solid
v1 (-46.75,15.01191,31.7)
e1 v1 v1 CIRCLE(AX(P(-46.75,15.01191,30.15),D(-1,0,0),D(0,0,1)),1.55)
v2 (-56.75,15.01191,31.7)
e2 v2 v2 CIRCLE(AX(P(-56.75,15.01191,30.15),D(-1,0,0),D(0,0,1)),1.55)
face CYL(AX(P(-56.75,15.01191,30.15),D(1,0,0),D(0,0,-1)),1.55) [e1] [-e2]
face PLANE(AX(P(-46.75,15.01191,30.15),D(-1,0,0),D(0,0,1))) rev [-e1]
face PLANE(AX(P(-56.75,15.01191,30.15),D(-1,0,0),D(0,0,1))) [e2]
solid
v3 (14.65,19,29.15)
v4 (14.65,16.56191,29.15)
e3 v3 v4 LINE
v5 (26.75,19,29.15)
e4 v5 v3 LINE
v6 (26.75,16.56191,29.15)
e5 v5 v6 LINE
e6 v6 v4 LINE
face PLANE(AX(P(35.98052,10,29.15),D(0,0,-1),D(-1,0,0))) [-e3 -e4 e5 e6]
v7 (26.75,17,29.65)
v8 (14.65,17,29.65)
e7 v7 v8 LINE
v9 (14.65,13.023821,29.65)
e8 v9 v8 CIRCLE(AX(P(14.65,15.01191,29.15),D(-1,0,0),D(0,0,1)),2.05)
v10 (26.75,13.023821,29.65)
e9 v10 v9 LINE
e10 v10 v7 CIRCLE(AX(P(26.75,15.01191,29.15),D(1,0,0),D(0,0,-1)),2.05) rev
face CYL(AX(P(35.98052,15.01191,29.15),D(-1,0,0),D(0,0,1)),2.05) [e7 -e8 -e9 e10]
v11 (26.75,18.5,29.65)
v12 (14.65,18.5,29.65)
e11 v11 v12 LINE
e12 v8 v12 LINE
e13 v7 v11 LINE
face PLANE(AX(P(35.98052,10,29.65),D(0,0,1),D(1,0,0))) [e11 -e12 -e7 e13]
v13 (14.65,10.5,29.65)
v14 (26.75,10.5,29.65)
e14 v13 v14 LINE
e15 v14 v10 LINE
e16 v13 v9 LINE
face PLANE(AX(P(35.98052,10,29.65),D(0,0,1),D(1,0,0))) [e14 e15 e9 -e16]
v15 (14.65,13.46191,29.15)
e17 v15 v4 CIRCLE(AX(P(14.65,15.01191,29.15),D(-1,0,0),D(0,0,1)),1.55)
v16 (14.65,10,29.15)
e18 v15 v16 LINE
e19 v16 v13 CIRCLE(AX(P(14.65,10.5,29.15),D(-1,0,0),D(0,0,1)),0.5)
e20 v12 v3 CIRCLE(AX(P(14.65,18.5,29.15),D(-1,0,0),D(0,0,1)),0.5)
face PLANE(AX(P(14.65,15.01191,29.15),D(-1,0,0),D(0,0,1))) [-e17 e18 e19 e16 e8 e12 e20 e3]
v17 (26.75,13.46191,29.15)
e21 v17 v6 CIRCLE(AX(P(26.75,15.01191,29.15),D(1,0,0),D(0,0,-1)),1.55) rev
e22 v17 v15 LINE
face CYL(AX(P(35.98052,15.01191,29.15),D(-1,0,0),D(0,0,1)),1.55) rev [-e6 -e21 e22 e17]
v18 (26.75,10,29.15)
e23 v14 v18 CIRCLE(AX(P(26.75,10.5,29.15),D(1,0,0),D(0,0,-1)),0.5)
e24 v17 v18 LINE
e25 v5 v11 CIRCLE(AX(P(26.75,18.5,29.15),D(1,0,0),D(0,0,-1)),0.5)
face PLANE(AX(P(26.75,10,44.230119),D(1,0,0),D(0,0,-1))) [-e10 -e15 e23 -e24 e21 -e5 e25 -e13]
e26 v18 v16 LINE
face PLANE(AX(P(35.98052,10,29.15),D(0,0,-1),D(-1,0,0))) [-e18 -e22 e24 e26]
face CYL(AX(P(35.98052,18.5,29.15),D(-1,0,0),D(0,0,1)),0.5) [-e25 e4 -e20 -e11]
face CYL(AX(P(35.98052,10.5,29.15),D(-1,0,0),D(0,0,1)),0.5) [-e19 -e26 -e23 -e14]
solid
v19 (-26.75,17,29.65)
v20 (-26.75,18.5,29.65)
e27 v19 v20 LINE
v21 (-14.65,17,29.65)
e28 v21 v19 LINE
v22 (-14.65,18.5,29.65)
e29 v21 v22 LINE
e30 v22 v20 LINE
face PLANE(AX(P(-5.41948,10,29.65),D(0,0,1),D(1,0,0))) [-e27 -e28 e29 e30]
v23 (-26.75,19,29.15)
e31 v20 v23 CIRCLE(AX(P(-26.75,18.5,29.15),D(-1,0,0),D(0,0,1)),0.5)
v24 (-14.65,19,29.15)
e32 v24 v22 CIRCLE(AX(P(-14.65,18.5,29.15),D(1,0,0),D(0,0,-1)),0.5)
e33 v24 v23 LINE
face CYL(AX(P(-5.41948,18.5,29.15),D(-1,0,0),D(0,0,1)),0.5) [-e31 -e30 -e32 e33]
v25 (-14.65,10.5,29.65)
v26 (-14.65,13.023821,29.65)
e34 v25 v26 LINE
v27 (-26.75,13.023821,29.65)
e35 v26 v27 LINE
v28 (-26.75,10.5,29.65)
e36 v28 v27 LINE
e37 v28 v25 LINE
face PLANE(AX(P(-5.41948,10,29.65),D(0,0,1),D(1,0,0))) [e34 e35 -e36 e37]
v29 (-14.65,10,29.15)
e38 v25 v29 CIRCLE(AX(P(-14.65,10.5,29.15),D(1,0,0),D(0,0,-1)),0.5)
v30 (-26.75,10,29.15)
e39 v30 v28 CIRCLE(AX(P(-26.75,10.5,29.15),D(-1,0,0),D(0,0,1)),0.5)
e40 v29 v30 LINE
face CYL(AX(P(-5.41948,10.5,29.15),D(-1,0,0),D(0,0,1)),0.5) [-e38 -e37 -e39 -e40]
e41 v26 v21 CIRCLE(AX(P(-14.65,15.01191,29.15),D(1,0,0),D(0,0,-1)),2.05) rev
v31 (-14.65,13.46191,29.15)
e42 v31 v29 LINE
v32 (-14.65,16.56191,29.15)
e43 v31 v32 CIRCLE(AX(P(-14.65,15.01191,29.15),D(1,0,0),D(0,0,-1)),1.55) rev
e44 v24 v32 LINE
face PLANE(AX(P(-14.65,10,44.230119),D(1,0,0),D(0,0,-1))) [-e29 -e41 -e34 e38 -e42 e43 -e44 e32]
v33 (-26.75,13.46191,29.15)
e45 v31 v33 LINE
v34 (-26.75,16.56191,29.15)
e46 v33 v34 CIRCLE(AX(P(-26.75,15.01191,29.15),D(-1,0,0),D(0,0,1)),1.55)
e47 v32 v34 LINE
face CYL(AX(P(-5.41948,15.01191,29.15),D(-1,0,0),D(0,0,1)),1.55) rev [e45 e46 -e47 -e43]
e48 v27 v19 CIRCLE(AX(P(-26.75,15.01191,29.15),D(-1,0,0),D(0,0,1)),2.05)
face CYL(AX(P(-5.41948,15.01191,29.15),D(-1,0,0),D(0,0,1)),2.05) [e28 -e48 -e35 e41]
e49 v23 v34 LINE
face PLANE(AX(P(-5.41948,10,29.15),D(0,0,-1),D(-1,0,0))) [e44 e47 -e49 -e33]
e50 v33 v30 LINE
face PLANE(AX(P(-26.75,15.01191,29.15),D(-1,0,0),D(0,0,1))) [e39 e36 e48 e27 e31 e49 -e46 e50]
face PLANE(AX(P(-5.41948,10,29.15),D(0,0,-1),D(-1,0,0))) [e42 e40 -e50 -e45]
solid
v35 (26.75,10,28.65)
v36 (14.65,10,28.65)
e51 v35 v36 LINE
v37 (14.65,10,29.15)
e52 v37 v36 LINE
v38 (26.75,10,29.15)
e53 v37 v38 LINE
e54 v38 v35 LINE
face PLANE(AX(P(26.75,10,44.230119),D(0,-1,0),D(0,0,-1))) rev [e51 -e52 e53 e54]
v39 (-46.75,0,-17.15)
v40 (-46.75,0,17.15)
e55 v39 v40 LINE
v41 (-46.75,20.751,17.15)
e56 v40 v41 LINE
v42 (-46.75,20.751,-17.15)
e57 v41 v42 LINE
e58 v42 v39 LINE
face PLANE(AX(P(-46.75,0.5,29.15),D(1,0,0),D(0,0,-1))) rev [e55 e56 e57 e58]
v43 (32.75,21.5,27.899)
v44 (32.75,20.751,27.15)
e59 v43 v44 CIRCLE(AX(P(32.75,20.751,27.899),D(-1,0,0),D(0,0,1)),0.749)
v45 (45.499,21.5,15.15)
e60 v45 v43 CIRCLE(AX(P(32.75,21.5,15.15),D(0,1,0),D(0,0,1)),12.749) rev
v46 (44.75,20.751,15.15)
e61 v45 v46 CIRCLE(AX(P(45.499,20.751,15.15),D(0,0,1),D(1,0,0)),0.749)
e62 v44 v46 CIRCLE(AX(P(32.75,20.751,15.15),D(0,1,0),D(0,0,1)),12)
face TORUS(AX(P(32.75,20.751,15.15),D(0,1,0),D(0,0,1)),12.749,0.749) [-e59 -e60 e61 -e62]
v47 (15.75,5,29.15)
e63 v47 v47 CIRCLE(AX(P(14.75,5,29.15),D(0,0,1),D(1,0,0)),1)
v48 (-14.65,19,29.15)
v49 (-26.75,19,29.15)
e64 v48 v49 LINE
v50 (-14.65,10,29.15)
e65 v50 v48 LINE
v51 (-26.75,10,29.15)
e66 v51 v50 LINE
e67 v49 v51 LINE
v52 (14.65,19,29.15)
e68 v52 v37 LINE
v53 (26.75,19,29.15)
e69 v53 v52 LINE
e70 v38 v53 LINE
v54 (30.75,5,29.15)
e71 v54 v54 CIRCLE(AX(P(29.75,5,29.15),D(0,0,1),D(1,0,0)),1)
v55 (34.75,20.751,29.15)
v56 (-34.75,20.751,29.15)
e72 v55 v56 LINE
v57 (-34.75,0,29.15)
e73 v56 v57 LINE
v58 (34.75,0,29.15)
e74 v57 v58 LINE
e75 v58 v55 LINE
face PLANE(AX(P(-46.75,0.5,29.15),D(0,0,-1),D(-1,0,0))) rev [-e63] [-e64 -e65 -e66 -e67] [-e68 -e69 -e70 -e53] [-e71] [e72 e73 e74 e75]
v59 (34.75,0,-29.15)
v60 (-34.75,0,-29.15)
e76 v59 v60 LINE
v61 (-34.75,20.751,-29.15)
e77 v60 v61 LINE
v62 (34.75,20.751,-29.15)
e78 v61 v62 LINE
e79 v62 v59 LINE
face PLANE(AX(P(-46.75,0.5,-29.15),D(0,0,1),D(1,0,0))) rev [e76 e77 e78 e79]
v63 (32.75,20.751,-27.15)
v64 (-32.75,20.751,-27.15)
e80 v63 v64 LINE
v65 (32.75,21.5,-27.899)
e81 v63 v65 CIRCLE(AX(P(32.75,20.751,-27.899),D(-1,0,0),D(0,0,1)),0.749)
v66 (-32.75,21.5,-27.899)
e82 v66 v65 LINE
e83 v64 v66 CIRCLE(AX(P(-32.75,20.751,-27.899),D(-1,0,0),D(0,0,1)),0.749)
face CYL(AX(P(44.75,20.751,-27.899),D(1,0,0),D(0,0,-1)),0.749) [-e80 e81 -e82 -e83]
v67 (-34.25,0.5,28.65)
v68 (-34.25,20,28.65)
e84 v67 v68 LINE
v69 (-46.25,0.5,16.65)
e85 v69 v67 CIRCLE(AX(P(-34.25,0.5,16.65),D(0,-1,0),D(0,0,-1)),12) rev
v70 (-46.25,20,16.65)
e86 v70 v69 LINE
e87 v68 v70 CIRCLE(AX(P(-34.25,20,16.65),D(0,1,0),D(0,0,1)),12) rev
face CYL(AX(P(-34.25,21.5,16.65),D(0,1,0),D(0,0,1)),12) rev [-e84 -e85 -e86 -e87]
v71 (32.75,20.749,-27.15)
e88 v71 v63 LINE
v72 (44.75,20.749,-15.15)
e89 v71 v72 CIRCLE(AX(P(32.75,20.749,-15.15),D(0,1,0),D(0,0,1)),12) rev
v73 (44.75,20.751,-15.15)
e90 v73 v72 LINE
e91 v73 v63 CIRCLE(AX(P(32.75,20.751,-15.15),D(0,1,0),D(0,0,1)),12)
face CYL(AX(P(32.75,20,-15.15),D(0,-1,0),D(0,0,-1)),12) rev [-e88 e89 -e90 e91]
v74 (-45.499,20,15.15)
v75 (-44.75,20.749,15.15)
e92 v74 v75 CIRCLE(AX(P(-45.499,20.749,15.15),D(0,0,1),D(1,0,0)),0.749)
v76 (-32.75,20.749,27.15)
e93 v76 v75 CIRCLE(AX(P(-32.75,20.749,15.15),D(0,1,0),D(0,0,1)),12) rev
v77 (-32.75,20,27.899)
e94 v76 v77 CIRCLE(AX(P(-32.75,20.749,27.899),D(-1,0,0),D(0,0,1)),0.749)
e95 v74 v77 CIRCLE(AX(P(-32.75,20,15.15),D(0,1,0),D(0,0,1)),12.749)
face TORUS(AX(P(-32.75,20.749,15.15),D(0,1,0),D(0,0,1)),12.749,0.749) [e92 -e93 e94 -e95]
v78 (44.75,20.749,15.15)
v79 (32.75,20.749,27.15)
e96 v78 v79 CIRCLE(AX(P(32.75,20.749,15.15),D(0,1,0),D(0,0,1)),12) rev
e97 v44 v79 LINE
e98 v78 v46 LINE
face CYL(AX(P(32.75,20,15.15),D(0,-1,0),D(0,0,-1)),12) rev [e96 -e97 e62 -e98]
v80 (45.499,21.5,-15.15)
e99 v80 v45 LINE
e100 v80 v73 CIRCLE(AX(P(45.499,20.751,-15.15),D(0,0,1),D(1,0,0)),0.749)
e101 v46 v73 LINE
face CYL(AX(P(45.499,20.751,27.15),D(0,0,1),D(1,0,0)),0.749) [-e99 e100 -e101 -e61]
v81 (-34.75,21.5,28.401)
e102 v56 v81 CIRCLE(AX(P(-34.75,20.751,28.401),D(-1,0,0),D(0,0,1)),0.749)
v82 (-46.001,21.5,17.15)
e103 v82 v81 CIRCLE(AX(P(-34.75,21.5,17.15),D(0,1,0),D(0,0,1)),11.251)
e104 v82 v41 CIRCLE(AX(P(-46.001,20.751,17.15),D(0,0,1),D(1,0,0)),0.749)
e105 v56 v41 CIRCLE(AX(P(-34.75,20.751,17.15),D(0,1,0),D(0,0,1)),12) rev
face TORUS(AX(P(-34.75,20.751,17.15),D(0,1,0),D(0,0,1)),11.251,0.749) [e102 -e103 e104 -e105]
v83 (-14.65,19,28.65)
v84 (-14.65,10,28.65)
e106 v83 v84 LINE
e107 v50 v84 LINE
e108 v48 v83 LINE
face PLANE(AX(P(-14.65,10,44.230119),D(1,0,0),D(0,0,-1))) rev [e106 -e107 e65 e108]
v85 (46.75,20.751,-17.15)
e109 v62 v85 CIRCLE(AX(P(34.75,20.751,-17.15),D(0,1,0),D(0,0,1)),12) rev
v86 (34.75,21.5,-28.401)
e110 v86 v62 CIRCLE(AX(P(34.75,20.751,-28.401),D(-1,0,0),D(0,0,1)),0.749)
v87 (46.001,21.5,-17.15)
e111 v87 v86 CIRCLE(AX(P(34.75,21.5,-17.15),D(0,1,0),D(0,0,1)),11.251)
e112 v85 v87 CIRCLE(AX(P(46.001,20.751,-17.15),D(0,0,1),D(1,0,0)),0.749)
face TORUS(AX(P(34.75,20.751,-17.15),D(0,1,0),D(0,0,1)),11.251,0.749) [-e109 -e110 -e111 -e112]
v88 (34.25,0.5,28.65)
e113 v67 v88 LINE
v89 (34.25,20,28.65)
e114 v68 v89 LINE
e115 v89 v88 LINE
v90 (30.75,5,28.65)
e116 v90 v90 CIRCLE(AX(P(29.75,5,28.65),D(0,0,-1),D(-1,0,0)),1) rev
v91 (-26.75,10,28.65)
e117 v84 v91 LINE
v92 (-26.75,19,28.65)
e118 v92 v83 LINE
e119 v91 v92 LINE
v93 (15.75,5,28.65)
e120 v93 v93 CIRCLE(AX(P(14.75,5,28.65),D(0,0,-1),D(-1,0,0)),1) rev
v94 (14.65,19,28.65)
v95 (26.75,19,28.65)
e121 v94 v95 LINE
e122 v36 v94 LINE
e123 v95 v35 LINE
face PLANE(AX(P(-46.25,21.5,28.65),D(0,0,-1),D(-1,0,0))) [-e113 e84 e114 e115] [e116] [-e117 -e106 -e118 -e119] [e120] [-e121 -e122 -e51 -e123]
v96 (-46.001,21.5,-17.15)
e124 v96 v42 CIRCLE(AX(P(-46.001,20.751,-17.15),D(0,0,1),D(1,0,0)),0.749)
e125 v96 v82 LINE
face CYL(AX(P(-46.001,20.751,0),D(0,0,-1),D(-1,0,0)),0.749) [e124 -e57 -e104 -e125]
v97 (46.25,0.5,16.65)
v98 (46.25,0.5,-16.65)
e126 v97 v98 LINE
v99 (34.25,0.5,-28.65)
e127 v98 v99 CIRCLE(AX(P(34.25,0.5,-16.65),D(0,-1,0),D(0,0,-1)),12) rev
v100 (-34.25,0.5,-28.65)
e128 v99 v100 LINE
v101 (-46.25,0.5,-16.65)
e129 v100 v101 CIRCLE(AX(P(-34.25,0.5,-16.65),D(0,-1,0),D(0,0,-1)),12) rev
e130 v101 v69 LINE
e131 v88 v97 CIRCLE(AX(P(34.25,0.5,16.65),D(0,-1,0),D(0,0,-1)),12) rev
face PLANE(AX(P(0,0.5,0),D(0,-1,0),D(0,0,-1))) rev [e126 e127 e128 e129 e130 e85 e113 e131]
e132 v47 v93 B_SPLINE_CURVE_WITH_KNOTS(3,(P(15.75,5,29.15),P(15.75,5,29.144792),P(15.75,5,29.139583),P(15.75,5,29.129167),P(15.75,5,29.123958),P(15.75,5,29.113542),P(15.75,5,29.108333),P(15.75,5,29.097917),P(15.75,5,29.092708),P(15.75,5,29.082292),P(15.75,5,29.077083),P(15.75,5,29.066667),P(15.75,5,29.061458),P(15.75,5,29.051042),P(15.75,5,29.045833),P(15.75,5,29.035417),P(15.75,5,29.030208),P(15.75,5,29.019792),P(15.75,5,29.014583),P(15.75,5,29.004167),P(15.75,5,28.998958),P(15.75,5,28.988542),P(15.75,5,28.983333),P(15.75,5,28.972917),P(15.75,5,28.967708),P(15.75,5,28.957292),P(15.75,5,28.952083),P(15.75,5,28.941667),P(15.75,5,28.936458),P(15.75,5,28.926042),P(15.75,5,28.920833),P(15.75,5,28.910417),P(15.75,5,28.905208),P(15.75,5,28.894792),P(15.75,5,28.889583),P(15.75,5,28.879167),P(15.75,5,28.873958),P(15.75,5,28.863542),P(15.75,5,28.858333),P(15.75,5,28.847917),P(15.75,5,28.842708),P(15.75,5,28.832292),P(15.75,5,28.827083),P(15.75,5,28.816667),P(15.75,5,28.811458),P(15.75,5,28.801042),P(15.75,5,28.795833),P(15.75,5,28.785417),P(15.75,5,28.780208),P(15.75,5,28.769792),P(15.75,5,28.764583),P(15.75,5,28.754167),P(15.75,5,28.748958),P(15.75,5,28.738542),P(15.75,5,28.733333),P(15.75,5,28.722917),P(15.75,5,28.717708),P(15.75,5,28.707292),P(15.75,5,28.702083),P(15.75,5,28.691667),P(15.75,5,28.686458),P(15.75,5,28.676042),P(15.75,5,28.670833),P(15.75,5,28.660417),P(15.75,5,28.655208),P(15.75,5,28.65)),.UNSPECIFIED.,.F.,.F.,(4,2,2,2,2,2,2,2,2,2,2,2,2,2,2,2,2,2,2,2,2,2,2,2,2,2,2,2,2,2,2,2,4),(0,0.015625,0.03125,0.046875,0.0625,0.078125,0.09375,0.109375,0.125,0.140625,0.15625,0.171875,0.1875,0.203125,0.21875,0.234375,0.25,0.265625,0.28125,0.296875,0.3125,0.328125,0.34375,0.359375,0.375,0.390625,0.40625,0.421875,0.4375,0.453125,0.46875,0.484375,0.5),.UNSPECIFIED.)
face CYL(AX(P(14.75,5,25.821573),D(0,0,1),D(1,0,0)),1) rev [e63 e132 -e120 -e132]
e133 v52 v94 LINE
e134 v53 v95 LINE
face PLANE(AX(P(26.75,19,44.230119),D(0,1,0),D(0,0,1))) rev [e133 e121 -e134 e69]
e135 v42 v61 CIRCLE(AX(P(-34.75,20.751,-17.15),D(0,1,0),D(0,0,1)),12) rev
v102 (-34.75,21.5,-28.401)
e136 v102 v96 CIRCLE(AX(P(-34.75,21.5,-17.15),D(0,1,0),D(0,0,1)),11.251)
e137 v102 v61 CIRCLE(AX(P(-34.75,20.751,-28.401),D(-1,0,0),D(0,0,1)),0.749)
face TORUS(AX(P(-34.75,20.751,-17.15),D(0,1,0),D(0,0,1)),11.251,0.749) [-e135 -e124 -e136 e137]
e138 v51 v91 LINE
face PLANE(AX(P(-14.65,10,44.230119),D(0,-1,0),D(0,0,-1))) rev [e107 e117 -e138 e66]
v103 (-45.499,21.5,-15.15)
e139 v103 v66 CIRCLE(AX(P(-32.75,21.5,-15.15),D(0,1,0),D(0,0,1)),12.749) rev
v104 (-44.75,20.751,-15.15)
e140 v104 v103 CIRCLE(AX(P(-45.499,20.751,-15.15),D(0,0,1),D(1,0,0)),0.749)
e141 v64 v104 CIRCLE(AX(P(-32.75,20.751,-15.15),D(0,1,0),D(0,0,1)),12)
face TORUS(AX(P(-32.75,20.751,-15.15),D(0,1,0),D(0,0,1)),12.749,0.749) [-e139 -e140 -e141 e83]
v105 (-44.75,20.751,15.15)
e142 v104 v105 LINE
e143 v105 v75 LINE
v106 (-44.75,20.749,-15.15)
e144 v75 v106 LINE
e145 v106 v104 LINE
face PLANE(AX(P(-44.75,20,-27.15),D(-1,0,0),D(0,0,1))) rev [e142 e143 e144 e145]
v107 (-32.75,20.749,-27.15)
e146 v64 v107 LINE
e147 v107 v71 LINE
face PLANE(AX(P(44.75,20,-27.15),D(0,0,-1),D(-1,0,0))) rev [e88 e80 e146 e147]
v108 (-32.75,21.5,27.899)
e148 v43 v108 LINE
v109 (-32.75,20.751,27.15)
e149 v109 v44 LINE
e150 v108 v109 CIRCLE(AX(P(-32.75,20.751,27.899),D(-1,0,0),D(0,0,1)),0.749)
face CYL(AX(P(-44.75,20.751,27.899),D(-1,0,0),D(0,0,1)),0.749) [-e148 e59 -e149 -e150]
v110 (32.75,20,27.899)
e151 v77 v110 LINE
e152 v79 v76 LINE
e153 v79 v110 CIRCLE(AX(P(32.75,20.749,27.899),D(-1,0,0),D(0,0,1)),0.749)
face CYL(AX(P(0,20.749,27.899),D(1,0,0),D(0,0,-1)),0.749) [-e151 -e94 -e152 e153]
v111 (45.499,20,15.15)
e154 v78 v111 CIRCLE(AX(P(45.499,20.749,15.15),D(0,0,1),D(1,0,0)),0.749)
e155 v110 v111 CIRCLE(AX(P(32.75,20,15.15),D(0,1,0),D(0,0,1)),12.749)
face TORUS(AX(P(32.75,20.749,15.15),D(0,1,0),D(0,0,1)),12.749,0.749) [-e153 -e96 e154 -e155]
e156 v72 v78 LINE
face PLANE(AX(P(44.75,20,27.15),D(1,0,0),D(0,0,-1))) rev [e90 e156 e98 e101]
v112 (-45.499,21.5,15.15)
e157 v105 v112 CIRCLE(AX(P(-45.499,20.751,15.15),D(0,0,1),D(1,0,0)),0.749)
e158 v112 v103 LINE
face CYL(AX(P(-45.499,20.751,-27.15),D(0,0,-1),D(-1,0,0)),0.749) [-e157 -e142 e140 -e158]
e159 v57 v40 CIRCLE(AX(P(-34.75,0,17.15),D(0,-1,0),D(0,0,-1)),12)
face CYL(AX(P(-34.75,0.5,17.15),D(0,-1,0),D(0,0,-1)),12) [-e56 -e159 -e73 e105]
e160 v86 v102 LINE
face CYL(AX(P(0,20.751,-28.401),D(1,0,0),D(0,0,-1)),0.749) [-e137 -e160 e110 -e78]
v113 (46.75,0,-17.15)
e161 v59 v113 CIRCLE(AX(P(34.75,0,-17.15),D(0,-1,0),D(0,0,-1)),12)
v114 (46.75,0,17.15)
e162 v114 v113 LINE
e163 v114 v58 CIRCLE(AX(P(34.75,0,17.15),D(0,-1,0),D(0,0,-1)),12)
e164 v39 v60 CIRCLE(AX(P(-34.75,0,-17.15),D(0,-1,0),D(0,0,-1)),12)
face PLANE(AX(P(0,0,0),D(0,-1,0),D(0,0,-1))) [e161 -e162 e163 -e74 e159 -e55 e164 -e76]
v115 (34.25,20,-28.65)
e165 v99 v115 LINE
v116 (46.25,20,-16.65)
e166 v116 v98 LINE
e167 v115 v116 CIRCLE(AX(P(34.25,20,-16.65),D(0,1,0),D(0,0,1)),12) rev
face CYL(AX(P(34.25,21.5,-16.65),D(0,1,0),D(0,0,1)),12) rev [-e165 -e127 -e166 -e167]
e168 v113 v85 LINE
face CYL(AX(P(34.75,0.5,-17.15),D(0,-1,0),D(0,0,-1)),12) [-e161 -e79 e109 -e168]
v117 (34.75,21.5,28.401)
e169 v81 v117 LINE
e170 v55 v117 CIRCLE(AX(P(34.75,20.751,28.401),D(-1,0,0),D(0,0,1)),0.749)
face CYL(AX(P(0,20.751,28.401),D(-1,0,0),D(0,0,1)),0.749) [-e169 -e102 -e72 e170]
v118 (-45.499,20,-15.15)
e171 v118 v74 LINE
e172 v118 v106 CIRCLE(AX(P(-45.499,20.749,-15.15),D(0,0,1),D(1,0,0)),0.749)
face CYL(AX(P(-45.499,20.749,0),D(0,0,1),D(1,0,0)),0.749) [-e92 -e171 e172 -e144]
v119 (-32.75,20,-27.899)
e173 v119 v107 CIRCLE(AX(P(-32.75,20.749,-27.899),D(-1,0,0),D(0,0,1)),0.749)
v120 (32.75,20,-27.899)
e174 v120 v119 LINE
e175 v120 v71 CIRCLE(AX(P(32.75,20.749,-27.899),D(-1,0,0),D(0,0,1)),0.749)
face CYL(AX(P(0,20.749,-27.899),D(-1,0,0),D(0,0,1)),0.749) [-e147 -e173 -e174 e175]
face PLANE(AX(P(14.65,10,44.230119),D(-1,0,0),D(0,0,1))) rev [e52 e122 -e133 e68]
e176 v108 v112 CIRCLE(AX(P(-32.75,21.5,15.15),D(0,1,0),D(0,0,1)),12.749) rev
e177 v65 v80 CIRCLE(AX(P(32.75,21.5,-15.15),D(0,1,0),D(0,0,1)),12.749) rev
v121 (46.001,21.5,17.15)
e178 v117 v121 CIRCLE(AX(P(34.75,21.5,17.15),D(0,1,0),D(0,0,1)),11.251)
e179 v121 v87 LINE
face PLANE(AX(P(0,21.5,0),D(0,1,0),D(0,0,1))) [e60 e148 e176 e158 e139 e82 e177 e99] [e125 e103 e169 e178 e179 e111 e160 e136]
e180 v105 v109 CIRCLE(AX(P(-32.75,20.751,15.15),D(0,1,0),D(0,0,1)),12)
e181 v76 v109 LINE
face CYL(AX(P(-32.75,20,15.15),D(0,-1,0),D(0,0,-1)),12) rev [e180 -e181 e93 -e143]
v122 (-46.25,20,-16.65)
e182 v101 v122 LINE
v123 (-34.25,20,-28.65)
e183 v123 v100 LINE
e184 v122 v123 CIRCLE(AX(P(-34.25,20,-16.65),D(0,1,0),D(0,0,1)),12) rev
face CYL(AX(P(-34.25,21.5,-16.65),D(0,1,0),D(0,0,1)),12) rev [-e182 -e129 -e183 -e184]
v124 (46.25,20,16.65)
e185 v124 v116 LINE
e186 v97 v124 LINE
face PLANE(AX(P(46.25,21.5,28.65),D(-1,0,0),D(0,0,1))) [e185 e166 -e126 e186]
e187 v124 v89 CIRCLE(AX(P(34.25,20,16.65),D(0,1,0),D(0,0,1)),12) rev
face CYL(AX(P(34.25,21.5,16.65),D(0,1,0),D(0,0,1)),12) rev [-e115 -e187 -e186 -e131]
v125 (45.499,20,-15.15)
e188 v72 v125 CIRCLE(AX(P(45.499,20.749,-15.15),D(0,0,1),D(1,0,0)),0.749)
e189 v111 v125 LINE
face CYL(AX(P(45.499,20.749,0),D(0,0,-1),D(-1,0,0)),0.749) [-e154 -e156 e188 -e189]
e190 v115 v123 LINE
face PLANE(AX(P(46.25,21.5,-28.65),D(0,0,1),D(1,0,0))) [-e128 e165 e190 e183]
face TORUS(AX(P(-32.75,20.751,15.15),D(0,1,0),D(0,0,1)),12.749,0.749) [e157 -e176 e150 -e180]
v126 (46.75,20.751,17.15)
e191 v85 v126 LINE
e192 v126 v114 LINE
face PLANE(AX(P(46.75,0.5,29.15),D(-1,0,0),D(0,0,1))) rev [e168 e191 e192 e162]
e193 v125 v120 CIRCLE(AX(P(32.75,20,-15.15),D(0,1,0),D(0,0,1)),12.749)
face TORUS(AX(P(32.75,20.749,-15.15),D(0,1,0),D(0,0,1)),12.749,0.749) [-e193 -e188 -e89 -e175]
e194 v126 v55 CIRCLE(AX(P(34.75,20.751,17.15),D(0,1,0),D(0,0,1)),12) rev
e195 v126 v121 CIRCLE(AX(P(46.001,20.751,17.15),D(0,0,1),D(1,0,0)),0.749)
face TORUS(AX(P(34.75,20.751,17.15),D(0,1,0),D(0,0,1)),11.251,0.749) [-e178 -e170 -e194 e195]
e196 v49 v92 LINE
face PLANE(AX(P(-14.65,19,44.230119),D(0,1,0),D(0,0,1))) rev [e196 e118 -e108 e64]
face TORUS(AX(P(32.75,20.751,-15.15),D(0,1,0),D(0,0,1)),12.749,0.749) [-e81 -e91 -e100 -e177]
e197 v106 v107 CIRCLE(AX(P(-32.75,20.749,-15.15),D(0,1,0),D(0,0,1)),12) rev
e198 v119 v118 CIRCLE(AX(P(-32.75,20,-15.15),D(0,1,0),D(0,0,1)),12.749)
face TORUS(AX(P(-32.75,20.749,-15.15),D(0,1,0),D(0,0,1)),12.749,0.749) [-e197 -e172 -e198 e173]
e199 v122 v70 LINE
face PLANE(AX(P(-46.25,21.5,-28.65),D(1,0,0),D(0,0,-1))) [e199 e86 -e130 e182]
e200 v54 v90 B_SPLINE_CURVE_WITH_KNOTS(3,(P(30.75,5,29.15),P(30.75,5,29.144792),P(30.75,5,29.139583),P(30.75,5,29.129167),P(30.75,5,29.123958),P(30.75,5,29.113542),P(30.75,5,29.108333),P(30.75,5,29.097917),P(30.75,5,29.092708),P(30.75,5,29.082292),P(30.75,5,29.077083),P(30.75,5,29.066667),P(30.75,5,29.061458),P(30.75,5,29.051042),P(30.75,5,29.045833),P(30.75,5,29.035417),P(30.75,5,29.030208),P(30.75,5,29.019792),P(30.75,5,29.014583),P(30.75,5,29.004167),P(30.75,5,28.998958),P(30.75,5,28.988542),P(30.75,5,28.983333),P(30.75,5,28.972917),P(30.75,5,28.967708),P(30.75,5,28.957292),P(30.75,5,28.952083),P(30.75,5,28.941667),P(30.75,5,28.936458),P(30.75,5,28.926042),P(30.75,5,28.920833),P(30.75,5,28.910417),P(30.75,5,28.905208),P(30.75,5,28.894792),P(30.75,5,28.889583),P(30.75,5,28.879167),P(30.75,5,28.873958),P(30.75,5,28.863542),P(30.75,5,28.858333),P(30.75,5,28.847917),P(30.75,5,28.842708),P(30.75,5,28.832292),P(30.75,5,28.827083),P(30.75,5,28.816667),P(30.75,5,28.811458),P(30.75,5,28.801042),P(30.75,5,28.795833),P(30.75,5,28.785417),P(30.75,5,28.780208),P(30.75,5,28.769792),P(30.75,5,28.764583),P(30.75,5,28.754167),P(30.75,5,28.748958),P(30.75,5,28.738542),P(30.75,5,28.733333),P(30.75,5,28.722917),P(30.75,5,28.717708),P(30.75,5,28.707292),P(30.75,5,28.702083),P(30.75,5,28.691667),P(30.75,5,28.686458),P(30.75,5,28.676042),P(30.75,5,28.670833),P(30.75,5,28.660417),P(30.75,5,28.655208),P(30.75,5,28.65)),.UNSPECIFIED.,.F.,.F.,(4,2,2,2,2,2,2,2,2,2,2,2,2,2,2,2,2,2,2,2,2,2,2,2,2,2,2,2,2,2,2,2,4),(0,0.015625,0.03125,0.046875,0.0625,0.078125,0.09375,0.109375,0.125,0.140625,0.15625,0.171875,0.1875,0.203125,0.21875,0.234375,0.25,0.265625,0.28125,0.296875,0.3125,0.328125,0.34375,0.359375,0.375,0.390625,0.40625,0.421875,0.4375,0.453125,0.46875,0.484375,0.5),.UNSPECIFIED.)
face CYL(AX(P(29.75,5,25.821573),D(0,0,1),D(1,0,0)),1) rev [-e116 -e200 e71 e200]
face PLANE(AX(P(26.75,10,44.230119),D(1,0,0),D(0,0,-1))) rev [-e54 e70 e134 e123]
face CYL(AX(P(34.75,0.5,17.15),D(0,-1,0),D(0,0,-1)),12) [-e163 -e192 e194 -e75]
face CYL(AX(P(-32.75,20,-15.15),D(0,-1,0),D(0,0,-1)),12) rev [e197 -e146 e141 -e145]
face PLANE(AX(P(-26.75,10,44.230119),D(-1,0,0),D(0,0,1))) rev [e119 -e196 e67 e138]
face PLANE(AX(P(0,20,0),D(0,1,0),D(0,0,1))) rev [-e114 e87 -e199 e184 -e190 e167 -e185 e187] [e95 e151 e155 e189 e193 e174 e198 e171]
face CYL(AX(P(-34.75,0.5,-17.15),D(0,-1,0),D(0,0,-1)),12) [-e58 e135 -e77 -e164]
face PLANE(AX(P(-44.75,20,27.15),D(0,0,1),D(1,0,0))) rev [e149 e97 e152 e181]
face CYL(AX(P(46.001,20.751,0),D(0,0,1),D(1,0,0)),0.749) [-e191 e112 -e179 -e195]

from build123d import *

# Parameters (mm, degrees)
SKETCH1_W           = 93.5
SKETCH1_H           = 58.3
BOSS_EXTRUDE1_DEPTH = 0.5
SKETCH2_W           = 93.5
SKETCH2_H           = 58.3
SKETCH2_W_2         = 92.5
SKETCH2_H_2         = 57.3
BOSS_EXTRUDE2_DEPTH = 21
SKETCH3_W           = 92.5
SKETCH3_H           = 57.3
SKETCH3_W_2         = 89.5
SKETCH3_H_2         = 54.3
BOSS_EXTRUDE3_DEPTH = 1.5
FILLET2_R           = 12
FILLET3_R           = 0.749
SKETCH4_W           = 12.1
SKETCH4_H           = 9
CUT_EXTRUDE1_DEPTH  = 0.5
BOSS_EXTRUDE4_START = -20
BOSS_EXTRUDE4_DEPTH = 12.1
BOSS_EXTRUDE5_START = -61.4
BOSS_EXTRUDE5_DEPTH = 12.1
FILLET4_R           = 0.5
FILLET5_R           = 0.5
SKETCH6_R           = 1.55
BOSS_EXTRUDE6_DEPTH = 10
SKETCH7_R           = 1
CUT_EXTRUDE2_DEPTH  = 0.5


with BuildPart() as part:
    # Sketch1 → Boss-Extrude1 (new body)
    with BuildSketch(Plane(origin=(0, 0, 0), x_dir=(1, 0, 0), z_dir=(0, 1, 0))):
        Rectangle(SKETCH1_W, SKETCH1_H)
    extrude(amount=BOSS_EXTRUDE1_DEPTH)

    # Sketch2 → Boss-Extrude2 (add)
    with BuildSketch(Plane(origin=(0, 0.5, 0), x_dir=(1, 0, 0), z_dir=(0, 1, 0))):
        Rectangle(SKETCH2_W, SKETCH2_H)
        Rectangle(SKETCH2_W_2, SKETCH2_H_2, mode=Mode.SUBTRACT)
    extrude(amount=BOSS_EXTRUDE2_DEPTH)

    # Sketch3 → Boss-Extrude3 (add)
    with BuildSketch(Plane(origin=(0, 21.5, 0), x_dir=(1, 0, 0), z_dir=(0, 1, 0))):
        Rectangle(SKETCH3_W, SKETCH3_H)
        Rectangle(SKETCH3_W_2, SKETCH3_H_2, mode=Mode.SUBTRACT)
    extrude(amount=-BOSS_EXTRUDE3_DEPTH)

    # Fillet2
    fillet2_edges = [part.edges().sort_by_distance(p)[0] for p in [
        (46.25, 10.25, -28.65),
        (-46.25, 10.25, -28.65),
        (46.25, 10.25, 28.65),
        (-46.25, 10.25, 28.65),
        (-44.75, 20.75, -27.15),
        (44.75, 20.75, -27.15),
        (44.75, 20.75, 27.15),
        (-44.75, 20.75, 27.15),
        (-46.75, 10.75, -29.15),
        (46.75, 10.75, -29.15),
        (46.75, 10.75, 29.15),
        (-46.75, 10.75, 29.15),
    ]]
    fillet(fillet2_edges, radius=FILLET2_R)

    # Fillet3
    fillet3_edges = [part.edges().sort_by_distance(p)[0] for p in [
        (-41.235281374, 20, 23.635281374),
        (41.235281374, 21.5, 23.635281374),
        (41.235281374, 20, 23.635281374),
        (41.235281374, 21.5, -23.635281374),
        (41.235281374, 20, -23.635281374),
        (43.235281374, 21.5, -25.635281374),
        (43.235281374, 21.5, 25.635281374),
        (-43.235281374, 21.5, 25.635281374),
        (-43.235281374, 21.5, -25.635281374),
        (-46.75, 21.5, 0),
        (0, 21.5, -29.15),
        (-44.75, 21.5, 0),
        (-44.75, 20, 0),
        (0, 21.5, -27.15),
        (0, 20, -27.15),
        (0, 21.5, 29.15),
        (0, 21.5, 27.15),
        (0, 20, 27.15),
        (44.75, 21.5, 0),
        (44.75, 20, 0),
        (46.75, 21.5, 0),
        (-41.235281374, 21.5, -23.635281374),
        (-41.235281374, 20, -23.635281374),
        (-41.235281374, 21.5, 23.635281374),
    ]]
    fillet(fillet3_edges, radius=FILLET3_R)

    # Sketch4 → Cut-Extrude1 (cut)
    with BuildSketch(Plane(origin=(0, 0, 28.65), x_dir=(-1, 0, 0), z_dir=(0, 0, -1))):
        with Locations((-20.7, 14.5)):
            Rectangle(SKETCH4_W, SKETCH4_H)
        with Locations((20.7, 14.5)):
            Rectangle(SKETCH4_W, SKETCH4_H)
    extrude(amount=-CUT_EXTRUDE1_DEPTH, mode=Mode.SUBTRACT)

    # Sketch7 → Cut-Extrude2 (cut)
    with BuildSketch(Plane.XY.offset(29.15)):
        with Locations((14.75, 5)):
            Circle(SKETCH7_R)
        with Locations((29.75, 5)):
            Circle(SKETCH7_R)
    extrude(amount=-CUT_EXTRUDE2_DEPTH, mode=Mode.SUBTRACT)


with BuildPart() as body_2:
    # Sketch5 → Boss-Extrude4 (new body)
    with BuildSketch(Plane.ZY.offset(46.75).offset(BOSS_EXTRUDE4_START)):
        with BuildLine():
            Line((29.65, 17), (29.65, 19))
            Line((29.65, 19), (29.15, 19))
            Line((29.15, 19), (29.15, 16.561910465))
            ThreePointArc((29.15, 16.561910465), (30.7, 15.011910465), (29.15, 13.461910465))
            Line((29.15, 13.461910465), (29.15, 10))
            Line((29.15, 10), (29.65, 10))
            Line((29.65, 10), (29.65, 13.02382093))
            ThreePointArc((29.65, 13.02382093), (31.2, 15.011910465), (29.65, 17))
        make_face()
    extrude(amount=-BOSS_EXTRUDE4_DEPTH)

    # Fillet4
    fillet4_edges = [body_2.edges().sort_by_distance(p)[0] for p in [
        (-20.7, 10, 29.65),
        (-20.7, 19, 29.65),
    ]]
    fillet(fillet4_edges, radius=FILLET4_R - 0.0001)  # a hair under: the kernel refuses the full size


with BuildPart() as body_3:
    # Sketch5<2> → Boss-Extrude5 (new body)
    with BuildSketch(Plane.ZY.offset(46.75).offset(BOSS_EXTRUDE5_START)):
        with BuildLine():
            Line((29.65, 17), (29.65, 19))
            Line((29.65, 19), (29.15, 19))
            Line((29.15, 19), (29.15, 16.561910465))
            ThreePointArc((29.15, 16.561910465), (30.7, 15.011910465), (29.15, 13.461910465))
            Line((29.15, 13.461910465), (29.15, 10))
            Line((29.15, 10), (29.65, 10))
            Line((29.65, 10), (29.65, 13.02382093))
            ThreePointArc((29.65, 13.02382093), (31.2, 15.011910465), (29.65, 17))
        make_face()
    extrude(amount=-BOSS_EXTRUDE5_DEPTH)

    # Fillet5
    fillet5_edges = [body_3.edges().sort_by_distance(p)[0] for p in [
        (20.7, 10, 29.65),
        (20.7, 19, 29.65),
    ]]
    fillet(fillet5_edges, radius=FILLET5_R - 0.0001)  # a hair under: the kernel refuses the full size


with BuildPart() as body_4:
    # Sketch6 → Boss-Extrude6 (new body)
    with BuildSketch(Plane.ZY.offset(46.75)):
        with Locations((30.15, 15.011910465)):
            Circle(SKETCH6_R)
    extrude(amount=BOSS_EXTRUDE6_DEPTH)


solid = Compound([part.part, body_2.part, body_3.part, body_4.part])
